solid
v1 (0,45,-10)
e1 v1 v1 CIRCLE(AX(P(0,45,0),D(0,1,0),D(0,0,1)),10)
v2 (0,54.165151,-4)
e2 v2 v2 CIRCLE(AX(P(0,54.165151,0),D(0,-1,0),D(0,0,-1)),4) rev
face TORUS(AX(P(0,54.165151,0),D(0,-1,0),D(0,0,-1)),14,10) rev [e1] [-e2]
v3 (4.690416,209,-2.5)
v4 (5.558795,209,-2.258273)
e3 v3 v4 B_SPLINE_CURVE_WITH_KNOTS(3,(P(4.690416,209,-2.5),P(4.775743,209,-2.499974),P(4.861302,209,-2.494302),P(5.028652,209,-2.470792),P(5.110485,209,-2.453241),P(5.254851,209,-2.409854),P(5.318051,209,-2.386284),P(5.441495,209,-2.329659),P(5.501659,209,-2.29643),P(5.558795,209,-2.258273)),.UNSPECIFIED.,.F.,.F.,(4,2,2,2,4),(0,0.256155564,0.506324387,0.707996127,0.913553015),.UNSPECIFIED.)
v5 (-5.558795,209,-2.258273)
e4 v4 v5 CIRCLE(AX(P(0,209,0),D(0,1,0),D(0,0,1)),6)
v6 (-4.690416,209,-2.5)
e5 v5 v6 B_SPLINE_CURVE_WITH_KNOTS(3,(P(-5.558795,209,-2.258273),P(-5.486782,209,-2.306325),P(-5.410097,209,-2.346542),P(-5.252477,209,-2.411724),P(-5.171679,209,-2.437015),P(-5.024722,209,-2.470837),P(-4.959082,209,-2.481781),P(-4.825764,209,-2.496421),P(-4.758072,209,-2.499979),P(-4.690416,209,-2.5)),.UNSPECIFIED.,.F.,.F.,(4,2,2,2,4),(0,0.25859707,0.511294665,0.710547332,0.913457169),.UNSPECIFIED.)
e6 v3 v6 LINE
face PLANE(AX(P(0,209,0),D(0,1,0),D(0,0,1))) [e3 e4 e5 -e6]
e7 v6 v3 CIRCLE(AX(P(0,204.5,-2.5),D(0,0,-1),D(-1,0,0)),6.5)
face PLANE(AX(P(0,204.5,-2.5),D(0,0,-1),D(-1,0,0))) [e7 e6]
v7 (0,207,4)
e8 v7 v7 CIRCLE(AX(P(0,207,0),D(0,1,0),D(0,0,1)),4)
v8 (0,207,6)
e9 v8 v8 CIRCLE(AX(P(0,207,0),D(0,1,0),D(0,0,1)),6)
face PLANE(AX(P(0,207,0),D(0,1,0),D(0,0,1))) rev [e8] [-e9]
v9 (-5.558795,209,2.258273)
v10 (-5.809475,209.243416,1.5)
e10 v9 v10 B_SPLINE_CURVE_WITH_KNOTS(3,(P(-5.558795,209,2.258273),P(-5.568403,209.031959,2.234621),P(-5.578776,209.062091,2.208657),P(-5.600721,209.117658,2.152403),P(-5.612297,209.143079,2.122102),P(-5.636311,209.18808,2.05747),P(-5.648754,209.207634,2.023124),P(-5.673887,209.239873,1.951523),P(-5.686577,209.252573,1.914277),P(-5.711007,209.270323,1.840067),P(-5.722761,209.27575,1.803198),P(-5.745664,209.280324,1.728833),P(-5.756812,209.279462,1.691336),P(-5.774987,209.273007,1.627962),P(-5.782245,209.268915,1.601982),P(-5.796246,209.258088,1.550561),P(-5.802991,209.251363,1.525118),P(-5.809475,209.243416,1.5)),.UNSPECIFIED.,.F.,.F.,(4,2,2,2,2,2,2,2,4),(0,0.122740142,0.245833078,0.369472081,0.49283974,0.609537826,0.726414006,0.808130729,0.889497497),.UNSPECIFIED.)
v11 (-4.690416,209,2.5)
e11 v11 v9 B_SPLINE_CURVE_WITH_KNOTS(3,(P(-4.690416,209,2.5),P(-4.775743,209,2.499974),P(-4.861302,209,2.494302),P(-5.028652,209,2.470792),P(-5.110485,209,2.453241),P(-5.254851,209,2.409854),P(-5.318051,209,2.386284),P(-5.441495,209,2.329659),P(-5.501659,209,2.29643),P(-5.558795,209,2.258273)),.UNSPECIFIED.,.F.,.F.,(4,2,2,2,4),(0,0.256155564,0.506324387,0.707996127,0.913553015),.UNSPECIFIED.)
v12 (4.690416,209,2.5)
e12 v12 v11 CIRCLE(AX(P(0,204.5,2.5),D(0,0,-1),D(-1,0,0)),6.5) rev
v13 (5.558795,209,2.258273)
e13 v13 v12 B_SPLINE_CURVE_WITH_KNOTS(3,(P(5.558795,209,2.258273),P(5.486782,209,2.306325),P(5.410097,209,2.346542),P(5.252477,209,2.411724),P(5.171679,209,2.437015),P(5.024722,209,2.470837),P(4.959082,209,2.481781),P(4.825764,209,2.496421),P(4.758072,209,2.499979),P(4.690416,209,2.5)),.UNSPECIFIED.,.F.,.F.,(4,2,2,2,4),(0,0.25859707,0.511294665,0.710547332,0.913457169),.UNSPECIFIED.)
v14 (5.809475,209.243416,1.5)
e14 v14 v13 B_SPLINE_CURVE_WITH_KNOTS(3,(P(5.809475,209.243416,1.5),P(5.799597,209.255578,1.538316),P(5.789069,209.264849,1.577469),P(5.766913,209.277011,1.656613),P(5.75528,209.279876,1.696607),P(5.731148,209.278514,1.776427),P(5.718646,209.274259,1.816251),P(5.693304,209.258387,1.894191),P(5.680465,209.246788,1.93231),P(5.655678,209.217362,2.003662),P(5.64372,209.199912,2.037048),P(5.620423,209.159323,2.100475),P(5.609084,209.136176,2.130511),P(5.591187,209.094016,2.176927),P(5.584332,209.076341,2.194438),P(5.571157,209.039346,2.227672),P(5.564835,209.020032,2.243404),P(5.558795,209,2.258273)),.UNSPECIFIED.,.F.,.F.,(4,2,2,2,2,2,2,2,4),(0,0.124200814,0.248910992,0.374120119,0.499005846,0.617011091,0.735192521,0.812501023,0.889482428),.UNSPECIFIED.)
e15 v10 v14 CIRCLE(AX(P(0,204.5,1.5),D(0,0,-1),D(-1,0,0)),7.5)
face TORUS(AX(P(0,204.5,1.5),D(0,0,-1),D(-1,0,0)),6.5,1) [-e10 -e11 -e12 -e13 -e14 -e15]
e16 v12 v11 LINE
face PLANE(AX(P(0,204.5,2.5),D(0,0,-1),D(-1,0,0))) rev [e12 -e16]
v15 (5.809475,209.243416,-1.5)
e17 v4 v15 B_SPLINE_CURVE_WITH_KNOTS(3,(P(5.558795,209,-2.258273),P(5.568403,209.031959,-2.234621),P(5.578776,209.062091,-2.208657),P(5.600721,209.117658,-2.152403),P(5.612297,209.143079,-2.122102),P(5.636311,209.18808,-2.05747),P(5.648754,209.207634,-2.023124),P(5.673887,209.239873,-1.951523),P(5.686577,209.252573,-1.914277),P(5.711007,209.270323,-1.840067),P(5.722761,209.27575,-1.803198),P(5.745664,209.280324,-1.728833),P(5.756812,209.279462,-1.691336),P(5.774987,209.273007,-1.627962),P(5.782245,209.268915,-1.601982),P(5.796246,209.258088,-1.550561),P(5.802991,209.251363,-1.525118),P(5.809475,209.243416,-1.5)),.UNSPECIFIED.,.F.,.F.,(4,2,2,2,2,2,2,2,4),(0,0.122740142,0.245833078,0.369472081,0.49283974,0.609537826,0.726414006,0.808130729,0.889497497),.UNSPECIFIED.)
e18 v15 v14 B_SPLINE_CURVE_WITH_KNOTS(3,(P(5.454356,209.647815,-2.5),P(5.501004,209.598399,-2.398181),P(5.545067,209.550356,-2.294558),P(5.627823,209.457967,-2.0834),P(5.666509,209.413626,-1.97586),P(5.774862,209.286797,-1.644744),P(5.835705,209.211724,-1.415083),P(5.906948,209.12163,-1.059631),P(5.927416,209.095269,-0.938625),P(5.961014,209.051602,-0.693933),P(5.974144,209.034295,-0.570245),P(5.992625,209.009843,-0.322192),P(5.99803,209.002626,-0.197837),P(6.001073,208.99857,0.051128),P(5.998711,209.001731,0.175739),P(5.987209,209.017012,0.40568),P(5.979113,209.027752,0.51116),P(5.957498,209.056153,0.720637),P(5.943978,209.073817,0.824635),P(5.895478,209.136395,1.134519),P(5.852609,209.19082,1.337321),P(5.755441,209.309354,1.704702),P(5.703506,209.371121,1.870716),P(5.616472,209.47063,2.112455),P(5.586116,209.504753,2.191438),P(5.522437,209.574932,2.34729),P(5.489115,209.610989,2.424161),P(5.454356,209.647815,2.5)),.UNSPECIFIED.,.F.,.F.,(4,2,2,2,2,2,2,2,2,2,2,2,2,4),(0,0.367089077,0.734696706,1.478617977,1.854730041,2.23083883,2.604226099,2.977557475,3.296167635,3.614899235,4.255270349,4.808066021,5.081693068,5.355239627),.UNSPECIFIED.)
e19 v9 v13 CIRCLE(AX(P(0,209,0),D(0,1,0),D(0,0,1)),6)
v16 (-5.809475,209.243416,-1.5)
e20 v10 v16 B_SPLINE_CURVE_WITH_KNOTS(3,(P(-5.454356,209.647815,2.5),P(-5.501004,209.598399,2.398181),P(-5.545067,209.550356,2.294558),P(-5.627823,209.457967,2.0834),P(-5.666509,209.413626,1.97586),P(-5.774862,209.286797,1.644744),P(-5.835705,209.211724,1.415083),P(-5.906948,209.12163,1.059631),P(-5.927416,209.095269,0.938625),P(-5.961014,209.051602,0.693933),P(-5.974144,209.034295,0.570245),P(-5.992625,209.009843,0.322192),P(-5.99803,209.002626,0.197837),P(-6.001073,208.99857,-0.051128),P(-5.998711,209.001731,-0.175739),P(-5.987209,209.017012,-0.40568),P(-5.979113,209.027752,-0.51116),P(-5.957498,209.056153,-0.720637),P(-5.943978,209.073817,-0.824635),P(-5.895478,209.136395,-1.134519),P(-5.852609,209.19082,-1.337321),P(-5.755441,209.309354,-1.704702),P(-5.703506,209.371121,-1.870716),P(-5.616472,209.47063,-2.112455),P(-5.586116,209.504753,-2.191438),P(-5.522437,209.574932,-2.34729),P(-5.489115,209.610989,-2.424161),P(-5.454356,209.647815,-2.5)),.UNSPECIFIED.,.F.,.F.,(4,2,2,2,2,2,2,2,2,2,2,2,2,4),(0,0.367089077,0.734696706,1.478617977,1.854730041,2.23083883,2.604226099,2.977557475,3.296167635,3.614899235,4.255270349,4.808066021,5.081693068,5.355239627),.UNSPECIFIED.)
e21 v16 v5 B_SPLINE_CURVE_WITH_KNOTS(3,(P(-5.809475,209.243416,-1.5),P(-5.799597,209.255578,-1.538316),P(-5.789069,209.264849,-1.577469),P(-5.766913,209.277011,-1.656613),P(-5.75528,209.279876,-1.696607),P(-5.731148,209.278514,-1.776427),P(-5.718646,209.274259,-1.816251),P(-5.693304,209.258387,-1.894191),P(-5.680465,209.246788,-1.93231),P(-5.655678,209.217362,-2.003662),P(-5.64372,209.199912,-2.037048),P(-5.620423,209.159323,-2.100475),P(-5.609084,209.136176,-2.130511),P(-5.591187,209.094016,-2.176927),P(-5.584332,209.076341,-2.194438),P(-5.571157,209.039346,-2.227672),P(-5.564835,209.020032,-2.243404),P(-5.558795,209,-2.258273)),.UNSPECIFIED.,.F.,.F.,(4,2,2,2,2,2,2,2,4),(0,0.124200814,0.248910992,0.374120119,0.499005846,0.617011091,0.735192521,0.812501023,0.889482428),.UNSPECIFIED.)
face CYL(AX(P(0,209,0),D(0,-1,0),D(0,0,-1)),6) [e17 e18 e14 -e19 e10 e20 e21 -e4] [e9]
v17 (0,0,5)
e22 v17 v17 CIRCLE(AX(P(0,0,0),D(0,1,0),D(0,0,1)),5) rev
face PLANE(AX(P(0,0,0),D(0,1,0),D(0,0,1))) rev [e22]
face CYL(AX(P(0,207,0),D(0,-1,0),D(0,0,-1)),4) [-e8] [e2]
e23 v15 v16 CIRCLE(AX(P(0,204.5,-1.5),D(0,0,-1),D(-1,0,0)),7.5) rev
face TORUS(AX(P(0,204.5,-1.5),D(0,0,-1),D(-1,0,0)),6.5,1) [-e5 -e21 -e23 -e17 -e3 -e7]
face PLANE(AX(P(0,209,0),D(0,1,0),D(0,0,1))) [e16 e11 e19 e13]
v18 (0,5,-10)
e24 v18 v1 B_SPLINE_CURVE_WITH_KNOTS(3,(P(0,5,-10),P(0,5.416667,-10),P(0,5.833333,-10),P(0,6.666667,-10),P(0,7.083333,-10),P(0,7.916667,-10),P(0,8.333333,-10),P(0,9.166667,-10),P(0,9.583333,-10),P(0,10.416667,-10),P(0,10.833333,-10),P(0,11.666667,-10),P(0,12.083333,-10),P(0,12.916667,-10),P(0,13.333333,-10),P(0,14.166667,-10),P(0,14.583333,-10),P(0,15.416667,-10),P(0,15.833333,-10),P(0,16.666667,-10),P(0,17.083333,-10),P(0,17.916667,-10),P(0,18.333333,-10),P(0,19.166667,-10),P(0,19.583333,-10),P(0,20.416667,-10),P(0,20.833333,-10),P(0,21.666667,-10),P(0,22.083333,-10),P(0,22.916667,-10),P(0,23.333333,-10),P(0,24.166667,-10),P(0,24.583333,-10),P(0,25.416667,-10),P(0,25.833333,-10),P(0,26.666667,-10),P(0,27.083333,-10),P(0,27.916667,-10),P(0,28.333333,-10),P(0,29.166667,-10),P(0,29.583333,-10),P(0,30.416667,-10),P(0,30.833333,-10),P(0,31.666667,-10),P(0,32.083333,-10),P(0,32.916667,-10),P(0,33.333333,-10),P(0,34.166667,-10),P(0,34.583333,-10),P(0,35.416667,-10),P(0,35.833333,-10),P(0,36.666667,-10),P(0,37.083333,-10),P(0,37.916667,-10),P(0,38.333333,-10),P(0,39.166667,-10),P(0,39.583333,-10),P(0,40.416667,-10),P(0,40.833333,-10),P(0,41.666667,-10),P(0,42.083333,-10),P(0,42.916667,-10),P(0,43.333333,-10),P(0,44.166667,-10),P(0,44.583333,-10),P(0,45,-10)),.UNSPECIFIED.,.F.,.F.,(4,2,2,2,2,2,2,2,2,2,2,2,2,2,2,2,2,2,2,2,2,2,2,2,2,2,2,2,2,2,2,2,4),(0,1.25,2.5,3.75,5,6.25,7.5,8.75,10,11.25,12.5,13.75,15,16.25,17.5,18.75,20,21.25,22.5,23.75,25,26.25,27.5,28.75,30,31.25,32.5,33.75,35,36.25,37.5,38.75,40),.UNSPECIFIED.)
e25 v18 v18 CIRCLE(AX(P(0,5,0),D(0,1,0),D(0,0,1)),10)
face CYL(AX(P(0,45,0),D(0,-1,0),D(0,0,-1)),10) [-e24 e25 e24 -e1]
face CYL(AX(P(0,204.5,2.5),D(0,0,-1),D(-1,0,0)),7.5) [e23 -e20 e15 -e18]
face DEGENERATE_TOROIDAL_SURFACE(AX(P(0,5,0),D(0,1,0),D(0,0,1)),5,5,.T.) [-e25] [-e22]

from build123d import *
from build123d.topology import SkipClean

# Parameters (mm, degrees)
SKETCH1_R           = 10
BOSS_EXTRUDE1_DEPTH = 45
FILLET1_R           = 5
SKETCH2_R           = 4
BOSS_EXTRUDE2_DEPTH = 162
SKETCH3_R           = 6
BOSS_EXTRUDE3_DEPTH = 2
BOSS_EXTRUDE4_DEPTH = 2.5
SKETCH5_OUTSIDE_W   = 64.776
SKETCH5_OUTSIDE_H   = 64.776
SKETCH5_OUTSIDE_R   = 6
CUT_EXTRUDE2_DEPTH  = 5
FILLET2_R           = 10
FILLET3_R           = 1


with BuildPart() as part:
    # Sketch1 → Boss-Extrude1 (new body)
    with BuildSketch(Plane(origin=(0, 0, 0), x_dir=(1, 0, 0), z_dir=(0, 1, 0))):
        with Locations(Location((0, 0, 0), (0, 0, 90))):
            Circle(SKETCH1_R)
    extrude(amount=BOSS_EXTRUDE1_DEPTH)

    # Fillet1
    fillet1_edges = [part.edges().sort_by_distance(p)[0] for p in [
        (0, 0, 10),
    ]]
    fillet(fillet1_edges, radius=FILLET1_R)

    # Sketch2 → Boss-Extrude2 (add)
    with BuildSketch(Plane(origin=(0, 45, 0), x_dir=(1, 0, 0), z_dir=(0, 1, 0))):
        with Locations(Location((0, 0, 0), (0, 0, 270))):
            Circle(SKETCH2_R)
    extrude(amount=BOSS_EXTRUDE2_DEPTH)

    # Sketch3 → Boss-Extrude3 (add)
    with BuildSketch(Plane(origin=(0, 207, 0), x_dir=(1, 0, 0), z_dir=(0, 1, 0))):
        with Locations(Location((0, 0, 0), (0, 0, 270))):
            Circle(SKETCH3_R)
    extrude(amount=BOSS_EXTRUDE3_DEPTH)

    # Sketch4 → Boss-Extrude4 (add, symmetric)
    with BuildSketch(Plane.XY):
        with BuildLine():
            Line((-6, 209), (6, 209))
            ThreePointArc((6, 209), (0, 212), (-6, 209))
        make_face()
    extrude(amount=BOSS_EXTRUDE4_DEPTH, both=True)

    # Sketch5 outside → Cut-Extrude2 (cut)
    with SkipClean():  # the faces are left unmerged after this step: merging them gives an invalid solid
        with BuildSketch(Plane.XZ.offset(-207)):
            Rectangle(SKETCH5_OUTSIDE_W, SKETCH5_OUTSIDE_H)
            with Locations(Location((0, 0, 0), (0, 0, 204.624318352))):
                Circle(SKETCH5_OUTSIDE_R, mode=Mode.SUBTRACT)
        extrude(amount=-CUT_EXTRUDE2_DEPTH, mode=Mode.SUBTRACT)
    add(part.part.scale(1), mode=Mode.REPLACE)  # the faces are merged on a copy

    # Fillet2
    # the kernel refuses this fillet: 10 mm, written as the material it adds along each edge
    with BuildSketch(Plane(origin=(0, 45, 0), x_dir=(0, 0, 1), z_dir=(-1, 0, 0))) as fillet2_piece_1:
        with BuildLine():
            CenterArc((14, 9.16515139), FILLET2_R, 180, 66.421821522)
            Line((10, 0), (9.92, -0.183303028))
            ThreePointArc((9.92, -0.183303028), (7, -0.2), (4, -0.2))
            Line((4, -0.2), (3.8, 0))
            Line((3.8, 0), (3.8, 9.16515139))
            Line((3.8, 9.16515139), (4, 9.16515139))
        make_face()
    revolve(axis=Axis((0, 45, 0), (0, 1, 0)))

    # Fillet3
    # the kernel refuses this fillet: 1 mm, written as the material it takes off along each edge
    with BuildSketch(Plane(origin=(0, 204.5, -2.5), x_dir=(0.9118550245849949, 0.41051238000710544, 0), z_dir=(0.41051238000710544, -0.9118550245849949, 0))) as fillet3_piece_1_section:
        with BuildLine():
            CenterArc((7.5 - FILLET3_R, FILLET3_R), FILLET3_R, 270, 90)
            Line((7.5, FILLET3_R), (7.5, 0))
            Line((7.5, 0), (7.5 - FILLET3_R, 0))
        make_face()
    fillet3_piece_1 = revolve(axis=Axis((0, 204.5, -2.5), (0, 0, 1)), revolution_arc=131.52594845, mode=Mode.PRIVATE)
    fillet3_piece_1 = split(fillet3_piece_1, bisect_by=Plane(origin=(0, 209, -2.216936938), z_dir=(0, 1, 0)), keep=Keep.TOP, mode=Mode.PRIVATE)
    add(fillet3_piece_1, mode=Mode.SUBTRACT)
    with BuildSketch(Plane(origin=(0, 204.5, 2.5), x_dir=(0.9118550245849949, 0.4105123800071055, 0), z_dir=(0.4105123800071055, -0.9118550245849949, 0))) as fillet3_piece_2_section:
        with BuildLine():
            CenterArc((7.5 - FILLET3_R, -FILLET3_R), FILLET3_R, 0, 90)
            Line((7.5 - FILLET3_R, 0), (7.5, 0))
            Line((7.5, 0), (7.5, -FILLET3_R))
        make_face()
    fillet3_piece_2 = revolve(axis=Axis((0, 204.5, 2.5), (0, 0, 1)), revolution_arc=131.52594845, mode=Mode.PRIVATE)
    fillet3_piece_2 = split(fillet3_piece_2, bisect_by=Plane(origin=(0, 209, 2.216936937), z_dir=(0, 1, 0)), keep=Keep.TOP, mode=Mode.PRIVATE)
    add(fillet3_piece_2, mode=Mode.SUBTRACT)


solid = part.part
